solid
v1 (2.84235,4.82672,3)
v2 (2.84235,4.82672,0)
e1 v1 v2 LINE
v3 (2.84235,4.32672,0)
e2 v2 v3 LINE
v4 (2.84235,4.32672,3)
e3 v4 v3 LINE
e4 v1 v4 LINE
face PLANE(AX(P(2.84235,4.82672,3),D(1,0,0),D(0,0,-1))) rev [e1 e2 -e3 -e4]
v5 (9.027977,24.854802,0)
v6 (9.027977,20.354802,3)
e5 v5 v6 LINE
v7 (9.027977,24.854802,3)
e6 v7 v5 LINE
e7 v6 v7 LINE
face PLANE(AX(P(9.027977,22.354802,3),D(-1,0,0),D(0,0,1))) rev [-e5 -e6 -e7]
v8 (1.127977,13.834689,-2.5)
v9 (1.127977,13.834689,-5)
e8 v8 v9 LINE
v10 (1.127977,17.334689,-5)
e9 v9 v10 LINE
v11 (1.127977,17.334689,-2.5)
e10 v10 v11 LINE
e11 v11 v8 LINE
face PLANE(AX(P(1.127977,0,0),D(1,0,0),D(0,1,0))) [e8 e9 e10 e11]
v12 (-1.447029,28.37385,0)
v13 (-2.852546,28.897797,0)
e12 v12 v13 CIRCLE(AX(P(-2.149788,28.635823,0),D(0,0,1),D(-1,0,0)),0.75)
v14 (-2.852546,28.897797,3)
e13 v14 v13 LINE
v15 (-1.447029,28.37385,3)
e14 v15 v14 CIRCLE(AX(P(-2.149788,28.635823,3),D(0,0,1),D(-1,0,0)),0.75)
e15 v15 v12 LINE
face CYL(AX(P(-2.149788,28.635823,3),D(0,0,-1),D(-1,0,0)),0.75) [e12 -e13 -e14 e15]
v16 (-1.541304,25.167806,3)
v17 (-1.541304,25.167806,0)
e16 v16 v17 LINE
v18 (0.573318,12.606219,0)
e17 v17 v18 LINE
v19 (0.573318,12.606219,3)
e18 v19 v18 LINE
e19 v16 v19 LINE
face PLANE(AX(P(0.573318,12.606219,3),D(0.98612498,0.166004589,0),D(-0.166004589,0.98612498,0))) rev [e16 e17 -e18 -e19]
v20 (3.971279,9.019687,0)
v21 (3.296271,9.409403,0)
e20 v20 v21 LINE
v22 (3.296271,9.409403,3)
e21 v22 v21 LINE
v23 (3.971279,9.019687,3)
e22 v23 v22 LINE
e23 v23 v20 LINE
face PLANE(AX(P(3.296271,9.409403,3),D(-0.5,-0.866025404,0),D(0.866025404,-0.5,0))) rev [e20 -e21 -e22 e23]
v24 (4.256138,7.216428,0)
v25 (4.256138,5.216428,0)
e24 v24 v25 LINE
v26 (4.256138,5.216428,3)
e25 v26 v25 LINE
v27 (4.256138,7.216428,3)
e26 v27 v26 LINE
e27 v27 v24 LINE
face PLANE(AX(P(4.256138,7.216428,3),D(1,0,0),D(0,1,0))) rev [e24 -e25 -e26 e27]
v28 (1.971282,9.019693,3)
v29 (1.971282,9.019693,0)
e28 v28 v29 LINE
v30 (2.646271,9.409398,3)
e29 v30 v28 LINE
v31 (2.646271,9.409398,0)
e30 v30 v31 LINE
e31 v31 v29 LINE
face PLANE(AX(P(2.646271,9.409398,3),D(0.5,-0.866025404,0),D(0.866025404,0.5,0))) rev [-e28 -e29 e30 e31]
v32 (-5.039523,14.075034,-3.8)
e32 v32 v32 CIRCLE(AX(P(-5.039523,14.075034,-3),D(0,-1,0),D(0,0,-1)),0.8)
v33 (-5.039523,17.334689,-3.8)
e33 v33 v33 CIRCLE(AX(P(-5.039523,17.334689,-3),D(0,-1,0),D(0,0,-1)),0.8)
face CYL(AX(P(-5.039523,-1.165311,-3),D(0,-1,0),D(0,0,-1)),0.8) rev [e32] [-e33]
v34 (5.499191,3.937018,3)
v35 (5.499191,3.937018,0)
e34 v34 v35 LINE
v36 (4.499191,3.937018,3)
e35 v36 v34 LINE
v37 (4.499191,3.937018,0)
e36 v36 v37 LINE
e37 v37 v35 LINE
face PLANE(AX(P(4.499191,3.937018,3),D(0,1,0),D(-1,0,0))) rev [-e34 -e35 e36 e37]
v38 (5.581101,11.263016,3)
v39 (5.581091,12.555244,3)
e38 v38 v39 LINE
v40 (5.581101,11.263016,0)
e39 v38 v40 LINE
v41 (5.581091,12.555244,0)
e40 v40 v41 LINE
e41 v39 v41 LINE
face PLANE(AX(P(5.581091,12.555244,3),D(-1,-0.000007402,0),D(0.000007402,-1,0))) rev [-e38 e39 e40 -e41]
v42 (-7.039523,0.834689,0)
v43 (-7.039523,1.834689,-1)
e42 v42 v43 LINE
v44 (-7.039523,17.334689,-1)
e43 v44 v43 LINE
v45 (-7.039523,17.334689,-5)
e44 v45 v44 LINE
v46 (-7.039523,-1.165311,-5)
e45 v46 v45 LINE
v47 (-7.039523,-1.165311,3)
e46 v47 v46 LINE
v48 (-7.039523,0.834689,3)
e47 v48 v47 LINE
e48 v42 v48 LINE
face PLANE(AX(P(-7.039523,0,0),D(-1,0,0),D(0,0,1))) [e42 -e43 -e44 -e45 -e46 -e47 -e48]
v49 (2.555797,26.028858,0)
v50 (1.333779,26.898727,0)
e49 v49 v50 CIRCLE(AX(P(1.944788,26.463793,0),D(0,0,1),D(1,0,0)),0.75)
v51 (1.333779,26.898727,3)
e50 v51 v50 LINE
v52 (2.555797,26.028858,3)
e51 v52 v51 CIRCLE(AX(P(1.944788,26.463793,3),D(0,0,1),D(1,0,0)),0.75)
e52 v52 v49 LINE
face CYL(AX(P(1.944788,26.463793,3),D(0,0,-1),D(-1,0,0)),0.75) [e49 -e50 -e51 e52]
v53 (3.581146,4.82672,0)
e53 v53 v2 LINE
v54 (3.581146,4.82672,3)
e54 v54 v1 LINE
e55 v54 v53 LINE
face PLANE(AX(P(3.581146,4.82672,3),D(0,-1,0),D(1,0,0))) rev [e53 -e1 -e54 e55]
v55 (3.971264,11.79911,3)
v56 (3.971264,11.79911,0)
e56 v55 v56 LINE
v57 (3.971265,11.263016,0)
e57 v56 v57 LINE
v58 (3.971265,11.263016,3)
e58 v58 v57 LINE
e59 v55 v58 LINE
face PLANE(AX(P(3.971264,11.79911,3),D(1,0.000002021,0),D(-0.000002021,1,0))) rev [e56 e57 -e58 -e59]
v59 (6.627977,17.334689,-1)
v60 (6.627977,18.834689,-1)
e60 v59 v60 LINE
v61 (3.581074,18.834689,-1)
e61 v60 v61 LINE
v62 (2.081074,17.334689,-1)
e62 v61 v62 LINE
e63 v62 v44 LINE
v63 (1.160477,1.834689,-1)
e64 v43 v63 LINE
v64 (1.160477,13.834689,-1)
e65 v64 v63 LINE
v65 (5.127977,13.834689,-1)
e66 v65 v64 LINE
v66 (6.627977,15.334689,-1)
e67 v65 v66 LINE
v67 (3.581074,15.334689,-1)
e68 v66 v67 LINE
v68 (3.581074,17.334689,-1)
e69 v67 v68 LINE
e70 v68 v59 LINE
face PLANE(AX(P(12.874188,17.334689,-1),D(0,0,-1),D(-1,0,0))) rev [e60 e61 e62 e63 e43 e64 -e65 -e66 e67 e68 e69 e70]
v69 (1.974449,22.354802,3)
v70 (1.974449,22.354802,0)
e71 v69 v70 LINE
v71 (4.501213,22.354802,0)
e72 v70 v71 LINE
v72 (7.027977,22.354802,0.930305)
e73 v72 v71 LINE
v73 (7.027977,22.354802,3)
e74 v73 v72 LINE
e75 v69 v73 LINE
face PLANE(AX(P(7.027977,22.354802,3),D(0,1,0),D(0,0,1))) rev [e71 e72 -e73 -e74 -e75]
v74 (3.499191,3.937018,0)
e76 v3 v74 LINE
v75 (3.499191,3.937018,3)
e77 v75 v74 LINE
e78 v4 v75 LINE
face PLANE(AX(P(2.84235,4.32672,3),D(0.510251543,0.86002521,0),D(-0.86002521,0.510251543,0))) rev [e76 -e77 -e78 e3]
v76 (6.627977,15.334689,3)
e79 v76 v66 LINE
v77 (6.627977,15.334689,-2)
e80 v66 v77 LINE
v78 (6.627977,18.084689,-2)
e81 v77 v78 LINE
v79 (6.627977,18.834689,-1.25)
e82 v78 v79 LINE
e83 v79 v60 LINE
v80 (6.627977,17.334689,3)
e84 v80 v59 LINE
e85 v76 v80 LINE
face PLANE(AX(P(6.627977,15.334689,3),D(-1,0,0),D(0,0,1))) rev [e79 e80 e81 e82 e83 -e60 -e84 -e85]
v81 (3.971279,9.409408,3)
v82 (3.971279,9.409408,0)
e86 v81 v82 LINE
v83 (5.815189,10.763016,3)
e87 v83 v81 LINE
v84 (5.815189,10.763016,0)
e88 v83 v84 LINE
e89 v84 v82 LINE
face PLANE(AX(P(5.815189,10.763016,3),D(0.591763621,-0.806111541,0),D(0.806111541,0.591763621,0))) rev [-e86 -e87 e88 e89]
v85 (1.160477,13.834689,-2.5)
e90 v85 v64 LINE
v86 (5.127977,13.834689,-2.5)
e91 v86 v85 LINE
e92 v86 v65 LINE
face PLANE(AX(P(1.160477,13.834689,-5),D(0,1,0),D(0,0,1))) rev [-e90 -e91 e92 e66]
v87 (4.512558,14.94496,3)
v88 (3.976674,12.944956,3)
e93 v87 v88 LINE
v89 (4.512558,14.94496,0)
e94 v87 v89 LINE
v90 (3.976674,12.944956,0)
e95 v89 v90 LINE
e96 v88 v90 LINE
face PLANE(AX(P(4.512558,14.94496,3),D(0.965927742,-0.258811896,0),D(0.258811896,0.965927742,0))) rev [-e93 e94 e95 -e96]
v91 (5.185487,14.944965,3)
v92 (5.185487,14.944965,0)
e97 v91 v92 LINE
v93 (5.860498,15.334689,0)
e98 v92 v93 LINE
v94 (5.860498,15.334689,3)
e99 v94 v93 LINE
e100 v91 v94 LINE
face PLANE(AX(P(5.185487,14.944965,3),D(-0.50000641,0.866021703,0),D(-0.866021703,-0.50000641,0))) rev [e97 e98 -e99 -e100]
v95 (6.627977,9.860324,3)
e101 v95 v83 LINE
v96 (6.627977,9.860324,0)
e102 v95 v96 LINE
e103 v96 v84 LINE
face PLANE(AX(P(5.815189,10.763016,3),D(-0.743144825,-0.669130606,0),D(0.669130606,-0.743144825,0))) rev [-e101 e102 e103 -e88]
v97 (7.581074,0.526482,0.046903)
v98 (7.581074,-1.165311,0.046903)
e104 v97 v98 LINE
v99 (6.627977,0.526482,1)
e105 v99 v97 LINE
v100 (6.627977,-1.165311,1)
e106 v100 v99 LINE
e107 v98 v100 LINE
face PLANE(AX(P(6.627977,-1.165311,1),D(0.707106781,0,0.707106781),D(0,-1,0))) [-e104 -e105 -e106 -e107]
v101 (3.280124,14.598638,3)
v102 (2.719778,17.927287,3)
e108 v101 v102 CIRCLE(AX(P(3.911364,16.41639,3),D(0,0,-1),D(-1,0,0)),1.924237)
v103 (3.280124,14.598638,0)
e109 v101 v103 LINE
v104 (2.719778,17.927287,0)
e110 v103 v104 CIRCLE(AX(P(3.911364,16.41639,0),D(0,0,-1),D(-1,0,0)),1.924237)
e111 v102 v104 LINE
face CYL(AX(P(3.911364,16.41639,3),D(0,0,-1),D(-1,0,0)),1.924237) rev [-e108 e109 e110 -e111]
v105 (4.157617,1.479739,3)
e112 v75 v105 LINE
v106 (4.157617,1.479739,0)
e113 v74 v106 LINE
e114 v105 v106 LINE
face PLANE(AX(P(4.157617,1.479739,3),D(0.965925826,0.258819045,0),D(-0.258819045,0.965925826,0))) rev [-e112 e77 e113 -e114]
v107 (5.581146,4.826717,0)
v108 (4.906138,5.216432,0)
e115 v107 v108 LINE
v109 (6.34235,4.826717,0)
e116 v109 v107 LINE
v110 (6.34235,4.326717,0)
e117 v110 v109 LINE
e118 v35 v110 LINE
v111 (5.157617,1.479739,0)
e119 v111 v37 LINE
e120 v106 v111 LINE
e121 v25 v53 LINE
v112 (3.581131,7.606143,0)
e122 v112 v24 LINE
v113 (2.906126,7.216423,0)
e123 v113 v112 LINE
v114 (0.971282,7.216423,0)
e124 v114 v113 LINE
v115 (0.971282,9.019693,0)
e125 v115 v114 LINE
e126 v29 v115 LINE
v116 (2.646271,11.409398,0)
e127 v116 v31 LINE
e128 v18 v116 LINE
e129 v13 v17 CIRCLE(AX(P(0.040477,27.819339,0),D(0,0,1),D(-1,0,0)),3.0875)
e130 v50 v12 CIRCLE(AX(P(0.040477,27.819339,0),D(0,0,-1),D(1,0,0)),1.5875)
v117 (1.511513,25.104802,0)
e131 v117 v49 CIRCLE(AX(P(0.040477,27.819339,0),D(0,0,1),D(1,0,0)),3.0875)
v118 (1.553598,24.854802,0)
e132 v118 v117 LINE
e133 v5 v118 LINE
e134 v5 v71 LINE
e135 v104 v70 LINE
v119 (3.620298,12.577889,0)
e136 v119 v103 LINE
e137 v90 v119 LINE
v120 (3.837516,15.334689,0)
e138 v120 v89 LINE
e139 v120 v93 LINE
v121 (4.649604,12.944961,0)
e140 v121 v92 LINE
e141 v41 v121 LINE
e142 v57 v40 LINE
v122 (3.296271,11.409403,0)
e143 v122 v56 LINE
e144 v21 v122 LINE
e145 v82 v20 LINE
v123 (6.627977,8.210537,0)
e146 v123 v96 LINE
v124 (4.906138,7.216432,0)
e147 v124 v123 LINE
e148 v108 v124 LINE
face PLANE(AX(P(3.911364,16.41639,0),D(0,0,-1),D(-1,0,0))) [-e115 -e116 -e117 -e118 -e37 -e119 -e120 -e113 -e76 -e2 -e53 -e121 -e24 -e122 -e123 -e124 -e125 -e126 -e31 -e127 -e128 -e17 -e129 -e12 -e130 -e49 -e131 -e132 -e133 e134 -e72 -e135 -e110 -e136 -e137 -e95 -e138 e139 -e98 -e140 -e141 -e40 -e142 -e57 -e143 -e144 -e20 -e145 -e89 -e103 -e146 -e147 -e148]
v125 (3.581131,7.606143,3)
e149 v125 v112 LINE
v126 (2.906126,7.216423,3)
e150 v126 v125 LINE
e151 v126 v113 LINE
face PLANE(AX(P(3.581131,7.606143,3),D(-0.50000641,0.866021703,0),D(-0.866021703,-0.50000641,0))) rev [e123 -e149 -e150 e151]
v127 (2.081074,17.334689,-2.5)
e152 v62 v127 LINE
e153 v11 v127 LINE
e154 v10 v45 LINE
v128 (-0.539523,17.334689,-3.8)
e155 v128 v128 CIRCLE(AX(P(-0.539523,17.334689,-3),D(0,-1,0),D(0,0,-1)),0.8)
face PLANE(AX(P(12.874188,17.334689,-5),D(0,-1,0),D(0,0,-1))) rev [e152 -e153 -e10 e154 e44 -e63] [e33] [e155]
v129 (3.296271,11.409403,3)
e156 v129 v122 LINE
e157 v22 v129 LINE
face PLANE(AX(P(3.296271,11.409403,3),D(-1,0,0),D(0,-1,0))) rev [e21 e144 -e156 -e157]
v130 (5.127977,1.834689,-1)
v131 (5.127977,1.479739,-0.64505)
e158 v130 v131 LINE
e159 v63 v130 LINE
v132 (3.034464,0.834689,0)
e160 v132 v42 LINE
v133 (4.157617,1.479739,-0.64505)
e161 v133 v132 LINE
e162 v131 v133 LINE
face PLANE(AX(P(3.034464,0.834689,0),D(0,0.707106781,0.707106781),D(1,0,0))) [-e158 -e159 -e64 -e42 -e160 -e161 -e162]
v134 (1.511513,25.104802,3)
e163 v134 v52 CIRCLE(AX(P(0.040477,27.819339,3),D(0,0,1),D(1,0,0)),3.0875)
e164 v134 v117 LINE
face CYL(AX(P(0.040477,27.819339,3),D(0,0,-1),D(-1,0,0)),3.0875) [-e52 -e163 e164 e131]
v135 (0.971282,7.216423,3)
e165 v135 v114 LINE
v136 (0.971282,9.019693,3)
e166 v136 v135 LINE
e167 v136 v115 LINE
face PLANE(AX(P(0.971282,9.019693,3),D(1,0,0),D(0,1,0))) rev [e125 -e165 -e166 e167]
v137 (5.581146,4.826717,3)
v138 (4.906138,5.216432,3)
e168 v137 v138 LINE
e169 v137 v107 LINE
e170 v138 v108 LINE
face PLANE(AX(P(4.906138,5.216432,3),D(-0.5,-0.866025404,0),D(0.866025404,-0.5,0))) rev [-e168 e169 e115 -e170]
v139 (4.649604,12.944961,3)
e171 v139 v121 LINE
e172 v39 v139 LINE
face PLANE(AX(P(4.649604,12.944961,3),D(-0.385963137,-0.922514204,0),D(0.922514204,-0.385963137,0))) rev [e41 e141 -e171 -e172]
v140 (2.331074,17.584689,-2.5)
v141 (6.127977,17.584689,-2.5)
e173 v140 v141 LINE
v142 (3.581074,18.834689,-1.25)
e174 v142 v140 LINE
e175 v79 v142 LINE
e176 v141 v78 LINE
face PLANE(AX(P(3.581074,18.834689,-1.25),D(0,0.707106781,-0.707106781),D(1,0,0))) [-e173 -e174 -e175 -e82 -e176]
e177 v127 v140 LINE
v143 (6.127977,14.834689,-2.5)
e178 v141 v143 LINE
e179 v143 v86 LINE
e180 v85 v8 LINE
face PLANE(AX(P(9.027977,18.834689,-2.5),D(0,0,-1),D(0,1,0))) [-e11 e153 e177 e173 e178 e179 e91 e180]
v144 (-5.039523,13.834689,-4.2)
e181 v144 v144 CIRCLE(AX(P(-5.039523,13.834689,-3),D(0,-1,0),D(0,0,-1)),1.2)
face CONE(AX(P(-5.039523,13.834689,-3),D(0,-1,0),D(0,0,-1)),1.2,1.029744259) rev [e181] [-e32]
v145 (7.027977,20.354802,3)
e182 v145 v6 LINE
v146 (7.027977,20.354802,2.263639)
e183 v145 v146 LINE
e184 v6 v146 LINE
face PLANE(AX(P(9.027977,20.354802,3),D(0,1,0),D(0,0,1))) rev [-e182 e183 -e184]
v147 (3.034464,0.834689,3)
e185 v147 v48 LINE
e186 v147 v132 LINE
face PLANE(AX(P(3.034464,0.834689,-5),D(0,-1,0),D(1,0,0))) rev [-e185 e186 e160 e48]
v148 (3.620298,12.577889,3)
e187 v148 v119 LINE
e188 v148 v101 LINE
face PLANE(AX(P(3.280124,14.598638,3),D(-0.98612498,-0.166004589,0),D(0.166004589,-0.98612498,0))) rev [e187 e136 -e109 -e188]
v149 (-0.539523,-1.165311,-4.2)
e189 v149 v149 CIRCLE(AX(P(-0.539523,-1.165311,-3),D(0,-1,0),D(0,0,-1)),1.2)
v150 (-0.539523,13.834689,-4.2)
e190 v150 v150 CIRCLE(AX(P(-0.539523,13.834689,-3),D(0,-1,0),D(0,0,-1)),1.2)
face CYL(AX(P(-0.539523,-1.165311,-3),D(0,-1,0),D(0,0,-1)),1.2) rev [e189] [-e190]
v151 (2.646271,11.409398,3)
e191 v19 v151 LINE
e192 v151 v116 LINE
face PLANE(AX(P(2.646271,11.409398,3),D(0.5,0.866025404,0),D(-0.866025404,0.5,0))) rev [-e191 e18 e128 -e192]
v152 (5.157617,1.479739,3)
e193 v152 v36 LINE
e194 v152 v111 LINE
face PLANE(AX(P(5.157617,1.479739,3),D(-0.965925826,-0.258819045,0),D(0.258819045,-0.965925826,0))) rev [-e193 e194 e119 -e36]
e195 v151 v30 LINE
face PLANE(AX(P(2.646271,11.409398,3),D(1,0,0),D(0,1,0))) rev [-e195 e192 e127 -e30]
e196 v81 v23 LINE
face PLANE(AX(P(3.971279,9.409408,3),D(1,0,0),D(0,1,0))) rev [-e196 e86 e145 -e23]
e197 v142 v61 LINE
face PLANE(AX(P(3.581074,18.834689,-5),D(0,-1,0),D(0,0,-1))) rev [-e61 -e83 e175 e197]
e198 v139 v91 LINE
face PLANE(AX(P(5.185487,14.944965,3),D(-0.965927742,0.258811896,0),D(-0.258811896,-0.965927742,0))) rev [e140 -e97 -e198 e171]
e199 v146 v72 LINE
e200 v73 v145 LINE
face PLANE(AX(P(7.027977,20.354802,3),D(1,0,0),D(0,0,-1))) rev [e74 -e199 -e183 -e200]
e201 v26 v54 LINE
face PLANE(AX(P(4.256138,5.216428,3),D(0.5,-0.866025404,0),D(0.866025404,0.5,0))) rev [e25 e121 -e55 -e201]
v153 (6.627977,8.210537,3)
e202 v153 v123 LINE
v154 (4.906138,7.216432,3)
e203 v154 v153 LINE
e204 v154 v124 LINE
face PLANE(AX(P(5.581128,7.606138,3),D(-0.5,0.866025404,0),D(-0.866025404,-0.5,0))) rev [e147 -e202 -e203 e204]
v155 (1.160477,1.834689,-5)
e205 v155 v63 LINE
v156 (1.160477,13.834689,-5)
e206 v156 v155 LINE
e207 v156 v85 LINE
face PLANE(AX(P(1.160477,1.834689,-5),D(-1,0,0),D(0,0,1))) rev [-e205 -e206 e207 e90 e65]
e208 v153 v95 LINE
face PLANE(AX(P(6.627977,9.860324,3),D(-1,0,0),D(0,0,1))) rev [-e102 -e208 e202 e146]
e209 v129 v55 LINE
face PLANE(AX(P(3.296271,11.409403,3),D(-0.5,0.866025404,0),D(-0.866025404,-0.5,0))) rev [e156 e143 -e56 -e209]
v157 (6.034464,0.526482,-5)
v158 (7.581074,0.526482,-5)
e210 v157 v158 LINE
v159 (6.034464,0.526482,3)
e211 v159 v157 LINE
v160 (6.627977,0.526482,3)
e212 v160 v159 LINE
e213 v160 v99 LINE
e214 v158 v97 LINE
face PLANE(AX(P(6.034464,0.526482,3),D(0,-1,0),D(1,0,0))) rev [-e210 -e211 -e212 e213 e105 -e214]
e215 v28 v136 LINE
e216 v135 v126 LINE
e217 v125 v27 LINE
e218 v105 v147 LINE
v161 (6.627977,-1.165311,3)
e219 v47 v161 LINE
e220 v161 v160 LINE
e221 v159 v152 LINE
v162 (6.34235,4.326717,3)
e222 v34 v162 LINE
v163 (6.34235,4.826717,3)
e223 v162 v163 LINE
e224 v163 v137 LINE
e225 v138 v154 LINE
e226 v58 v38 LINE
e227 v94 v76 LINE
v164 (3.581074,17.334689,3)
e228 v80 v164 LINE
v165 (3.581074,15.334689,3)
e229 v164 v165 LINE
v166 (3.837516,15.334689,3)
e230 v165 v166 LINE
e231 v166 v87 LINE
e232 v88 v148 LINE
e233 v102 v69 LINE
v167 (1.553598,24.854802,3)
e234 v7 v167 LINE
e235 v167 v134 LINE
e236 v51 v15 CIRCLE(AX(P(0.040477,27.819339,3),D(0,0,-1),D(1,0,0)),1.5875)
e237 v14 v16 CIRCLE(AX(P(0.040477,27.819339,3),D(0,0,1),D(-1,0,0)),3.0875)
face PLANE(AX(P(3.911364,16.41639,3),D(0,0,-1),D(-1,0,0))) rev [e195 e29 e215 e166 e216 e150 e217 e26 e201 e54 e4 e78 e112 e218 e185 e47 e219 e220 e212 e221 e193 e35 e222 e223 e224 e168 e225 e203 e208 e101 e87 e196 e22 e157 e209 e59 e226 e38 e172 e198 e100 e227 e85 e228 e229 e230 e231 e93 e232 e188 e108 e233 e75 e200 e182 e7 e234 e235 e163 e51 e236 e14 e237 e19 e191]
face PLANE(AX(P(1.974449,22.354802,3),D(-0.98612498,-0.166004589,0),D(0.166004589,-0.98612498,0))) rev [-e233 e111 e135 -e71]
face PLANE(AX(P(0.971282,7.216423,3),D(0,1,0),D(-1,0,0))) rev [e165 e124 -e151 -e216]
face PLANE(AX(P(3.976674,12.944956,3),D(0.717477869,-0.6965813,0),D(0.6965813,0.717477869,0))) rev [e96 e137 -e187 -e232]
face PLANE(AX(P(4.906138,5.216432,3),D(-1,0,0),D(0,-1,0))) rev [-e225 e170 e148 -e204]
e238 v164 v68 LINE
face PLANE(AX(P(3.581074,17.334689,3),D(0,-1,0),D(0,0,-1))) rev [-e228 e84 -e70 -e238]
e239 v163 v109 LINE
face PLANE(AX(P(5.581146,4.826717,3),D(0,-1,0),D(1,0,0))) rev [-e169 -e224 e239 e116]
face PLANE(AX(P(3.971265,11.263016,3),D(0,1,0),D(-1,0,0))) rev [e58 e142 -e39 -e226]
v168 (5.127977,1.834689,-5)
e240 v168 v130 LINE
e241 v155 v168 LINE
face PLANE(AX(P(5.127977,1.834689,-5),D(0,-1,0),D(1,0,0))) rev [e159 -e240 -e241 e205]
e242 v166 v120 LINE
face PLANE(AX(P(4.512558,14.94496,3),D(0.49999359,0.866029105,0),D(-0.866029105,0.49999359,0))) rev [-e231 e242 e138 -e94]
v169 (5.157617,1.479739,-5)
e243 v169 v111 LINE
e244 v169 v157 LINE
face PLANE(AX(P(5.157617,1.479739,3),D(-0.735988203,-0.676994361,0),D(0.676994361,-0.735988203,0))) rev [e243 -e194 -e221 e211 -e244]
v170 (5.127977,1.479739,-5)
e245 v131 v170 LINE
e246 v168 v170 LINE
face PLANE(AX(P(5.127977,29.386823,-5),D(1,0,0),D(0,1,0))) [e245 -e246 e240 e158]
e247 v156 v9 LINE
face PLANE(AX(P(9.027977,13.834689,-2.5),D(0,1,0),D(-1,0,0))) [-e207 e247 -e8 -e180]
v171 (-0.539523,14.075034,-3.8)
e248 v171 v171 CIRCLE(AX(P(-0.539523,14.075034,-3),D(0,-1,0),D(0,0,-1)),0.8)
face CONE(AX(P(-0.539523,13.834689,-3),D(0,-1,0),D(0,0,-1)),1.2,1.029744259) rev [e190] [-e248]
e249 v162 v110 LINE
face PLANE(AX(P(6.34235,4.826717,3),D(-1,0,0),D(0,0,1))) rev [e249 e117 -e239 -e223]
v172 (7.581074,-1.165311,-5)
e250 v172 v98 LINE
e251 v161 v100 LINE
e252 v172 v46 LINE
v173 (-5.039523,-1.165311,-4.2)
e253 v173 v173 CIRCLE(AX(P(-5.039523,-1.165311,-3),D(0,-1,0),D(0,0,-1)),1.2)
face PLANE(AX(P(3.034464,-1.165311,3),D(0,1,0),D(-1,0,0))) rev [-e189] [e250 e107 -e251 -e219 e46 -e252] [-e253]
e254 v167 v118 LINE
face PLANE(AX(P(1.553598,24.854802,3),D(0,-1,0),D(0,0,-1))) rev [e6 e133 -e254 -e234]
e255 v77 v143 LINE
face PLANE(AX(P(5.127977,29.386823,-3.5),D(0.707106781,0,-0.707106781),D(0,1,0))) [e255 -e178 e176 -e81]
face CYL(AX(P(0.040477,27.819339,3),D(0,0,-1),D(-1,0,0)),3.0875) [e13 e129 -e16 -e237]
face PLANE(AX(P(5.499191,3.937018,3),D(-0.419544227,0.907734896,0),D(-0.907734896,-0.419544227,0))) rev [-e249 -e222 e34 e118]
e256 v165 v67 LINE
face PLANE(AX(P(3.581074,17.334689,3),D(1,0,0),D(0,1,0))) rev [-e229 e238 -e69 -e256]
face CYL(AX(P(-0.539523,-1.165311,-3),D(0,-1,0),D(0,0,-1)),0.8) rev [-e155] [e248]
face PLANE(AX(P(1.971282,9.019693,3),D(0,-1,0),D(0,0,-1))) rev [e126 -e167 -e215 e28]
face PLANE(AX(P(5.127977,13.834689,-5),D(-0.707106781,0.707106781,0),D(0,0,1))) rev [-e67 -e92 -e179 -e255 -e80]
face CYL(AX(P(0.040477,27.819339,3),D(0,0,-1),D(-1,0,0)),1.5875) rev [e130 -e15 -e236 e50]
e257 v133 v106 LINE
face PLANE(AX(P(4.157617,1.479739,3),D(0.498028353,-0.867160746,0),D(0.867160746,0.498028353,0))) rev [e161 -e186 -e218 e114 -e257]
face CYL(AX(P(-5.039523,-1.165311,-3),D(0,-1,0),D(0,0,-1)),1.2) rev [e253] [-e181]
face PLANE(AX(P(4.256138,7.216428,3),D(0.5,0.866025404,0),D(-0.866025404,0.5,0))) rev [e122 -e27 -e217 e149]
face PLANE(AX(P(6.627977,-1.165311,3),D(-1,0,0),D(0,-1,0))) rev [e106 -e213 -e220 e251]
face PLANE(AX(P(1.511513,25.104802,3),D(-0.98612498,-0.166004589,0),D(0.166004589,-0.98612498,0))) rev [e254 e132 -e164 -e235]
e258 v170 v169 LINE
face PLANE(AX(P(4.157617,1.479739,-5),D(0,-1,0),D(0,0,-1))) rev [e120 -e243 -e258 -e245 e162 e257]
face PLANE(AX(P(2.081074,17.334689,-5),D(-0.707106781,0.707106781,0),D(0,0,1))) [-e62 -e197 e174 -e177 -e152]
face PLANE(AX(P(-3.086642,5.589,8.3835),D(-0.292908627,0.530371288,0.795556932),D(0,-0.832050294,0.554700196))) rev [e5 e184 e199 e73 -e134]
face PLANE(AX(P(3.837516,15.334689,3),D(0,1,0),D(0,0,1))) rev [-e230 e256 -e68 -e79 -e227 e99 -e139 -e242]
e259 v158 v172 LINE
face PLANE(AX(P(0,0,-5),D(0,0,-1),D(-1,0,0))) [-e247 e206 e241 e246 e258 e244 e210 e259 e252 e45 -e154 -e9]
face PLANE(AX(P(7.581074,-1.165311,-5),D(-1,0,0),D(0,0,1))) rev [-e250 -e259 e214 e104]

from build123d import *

# Parameters (mm, degrees)
BOSS_SWITCH_BODY_DEPTH                    = 3
SKETCH1_W                                 = 4
SKETCH1_H                                 = 3.5
BOSS_FLANGE_WIDTH_DEPTH                   = 5
BOSS_FLANGE_HEIGHT_REACH                  = 35.863
SKETCH2_W                                 = 4
SKETCH2_H                                 = 2
SKETCH2_W_2                               = 8
CUT_UP_TO_DOWN_DERAILLEUR_CLEARANCE_REACH = 21.462
SKETCH10_W                                = 2.453096586
SKETCH10_H                                = 3
SKETCH17_W                                = 12.1675
SKETCH17_H                                = 4
BOSS_FLANGE_SUPPORT_DEPTH                 = 14.499999955
TAP_DRILL_FOR_M2X0_4_TAP1_D               = 1.6
M2_CLEARANCE_HOLE2_D                      = 2.4
M2_CLEARANCE_HOLE2_DEPTH                  = 15
M2_CLEARANCE_HOLE2_TIP                    = 0.721032743
CHAMFER_FLANGE_SUPPORT_SIZE               = 1.5
CHAMFER_FLANGE_SUPPORT_2_SIZE             = 1.5
CHAMFER_FLANGE_SUPPORT_3_SIZE             = 1
SKETCH23_W                                = 3.9675
SKETCH23_H                                = 11.999999954
CUT_GAP_FOR_PRINTING_DEPTH                = 32.000499688
SKETCH25_W                                = 0.953096586
SKETCH25_H                                = 3.5
CUT_DERAILLEUR_CLEARANCE_DEPTH            = 32.145320369
CHAMFER8_SIZE                             = 1
CUT_UP_TO_DOWN_CANTILEVER_SLOPE_REACH     = 31.869
SKETCH26_W                                = 12.477246204
SKETCH26_H                                = 5.771077126
CUT_WIDE_DERAILLEUR_CLEARANCE_DEPTH       = 33.195879702
CUT_WIDE_DERAILLEUR_CLEARANCE_DEPTH_BACK  = 4
SKETCH27_W                                = 2.5
SKETCH27_H                                = 5.000000046
CHAMFER9_SIZE                             = 1.25
SKETCH28_W                                = 3.046903414
SKETCH28_H                                = 1.5
CUT_EXTRUDE1_DEPTH                        = 1


# Some blends are built 0.0001 mm under size
with BuildPart() as part:
    # Sketch-SwitchBossUp → Boss-Switch Body (new body)
    with BuildSketch(Plane.XY):
        with BuildLine():
            Line((5.581091201, 12.55524379), (5.581100766, 11.263016279))
            Line((5.581100766, 11.263016279), (3.971265023, 11.263016279))
            Line((3.971265023, 11.263016279), (3.97126394, 11.79911022))
            Line((3.97126394, 11.79911022), (3.296271341, 11.409403061))
            Line((3.296271341, 11.409403061), (3.296271341, 9.409403061))
            Line((3.296271341, 9.409403061), (3.971278743, 9.019687356))
            Line((3.971278743, 9.019687356), (3.971278743, 9.409408058))
            Line((3.971278743, 9.409408058), (5.815189336, 10.763016279))
            Line((5.815189336, 10.763016279), (6.627976927, 9.860324207))
            Line((6.627976927, 9.860324207), (6.627976927, 8.210536506))
            Line((6.627976927, 8.210536506), (5.581127833, 7.606137899))
            Line((5.581127833, 7.606137899), (4.906138119, 7.216432406))
            Line((4.906138119, 7.216432406), (4.906138119, 5.216432406))
            Line((4.906138119, 5.216432406), (5.58114552, 4.826716701))
            Line((5.58114552, 4.826716701), (6.342350466, 4.826716701))
            Line((6.342350466, 4.826716701), (6.342350466, 4.326716701))
            Line((6.342350466, 4.326716701), (5.499190584, 3.937018274))
            Line((5.499190584, 3.937018274), (4.499190584, 3.937018274))
            Line((4.499190584, 3.937018274), (5.157616583, 1.479738993))
            Line((5.157616583, 1.479738993), (6.034464198, 0.526482161))
            Line((6.034464198, 0.526482161), (6.627976927, 0.526482161))
            Line((6.627976927, 0.526482161), (6.627976927, -1.165310653))
            Line((6.627976927, -1.165310653), (3.034464198, -1.165310653))
            Line((3.034464198, -1.165310653), (3.034464198, 0.834689347))
            Line((3.034464198, 0.834689347), (4.157616583, 1.479738993))
            Line((4.157616583, 1.479738993), (3.499190584, 3.937018274))
            Line((3.499190584, 3.937018274), (2.842350466, 4.326720436))
            Line((2.842350466, 4.326720436), (2.842350466, 4.826720436))
            Line((2.842350466, 4.826720436), (3.58114552, 4.826720436))
            Line((3.58114552, 4.826720436), (4.256138119, 5.216427595))
            Line((4.256138119, 5.216427595), (4.256138119, 7.216427595))
            Line((4.256138119, 7.216427595), (3.581130717, 7.6061433))
            Line((3.581130717, 7.6061433), (2.9061262, 7.216422599))
            Line((2.9061262, 7.216422599), (0.971281627, 7.216422599))
            Line((0.971281627, 7.216422599), (0.971281627, 9.019692757))
            Line((0.971281627, 9.019692757), (1.971281627, 9.019692757))
            Line((1.971281627, 9.019692757), (2.646271341, 9.40939825))
            Line((2.646271341, 9.40939825), (2.646271341, 11.40939825))
            Line((2.646271341, 11.40939825), (1.696557212, 11.957715958))
            Line((1.696557212, 11.957715958), (0.573317845, 12.60621851))
            Line((0.573317845, 12.60621851), (-1.541303694, 25.167805745))
            ThreePointArc((-1.541303694, 25.167805745), (-2.872284003, 26.795385437), (-2.852546321, 28.897797067))
            ThreePointArc((-2.852546321, 28.897797067), (-1.887813913, 29.338582026), (-1.447028953, 28.373849618))
            ThreePointArc((-1.447028953, 28.373849618), (-0.703448682, 26.416936722), (1.333779254, 26.898727173))
            ThreePointArc((1.333779254, 26.898727173), (2.379722745, 27.074801628), (2.555797201, 26.028858137))
            ThreePointArc((2.555797201, 26.028858137), (2.086504637, 25.507104397), (1.511513111, 25.104801997))
            Line((1.511513111, 25.104801997), (1.553598189, 24.854801997))
            Line((1.553598189, 24.854801997), (9.027976927, 24.854801997))
            Line((9.027976927, 24.854801997), (9.027976927, 22.354801997))
            Line((9.027976927, 22.354801997), (9.027976927, 20.354801997))
            Line((9.027976927, 20.354801997), (7.027976927, 20.354801997))
            Line((7.027976927, 20.354801997), (7.027976927, 22.354801997))
            Line((7.027976927, 22.354801997), (1.974448974, 22.354801997))
            Line((1.974448974, 22.354801997), (2.719778232, 17.927287042))
            ThreePointArc((2.719778232, 17.927287042), (2.013826204, 16.096957693), (3.280124137, 14.598637521))
            Line((3.280124137, 14.598637521), (3.620297651, 12.577888564))
            Line((3.620297651, 12.577888564), (3.976674365, 12.944956135))
            Line((3.976674365, 12.944956135), (4.512557947, 14.944960101))
            Line((4.512557947, 14.944960101), (3.837515632, 15.334689301))
            Line((3.837515632, 15.334689301), (3.581073513, 15.334689301))
            Line((3.581073513, 15.334689301), (3.581073513, 17.334689301))
            Line((3.581073513, 17.334689301), (5.725580434, 17.334689301))
            Line((5.725580434, 17.334689301), (6.627976927, 17.334689301))
            Line((6.627976927, 17.334689301), (6.627976927, 15.334689301))
            Line((6.627976927, 15.334689301), (5.860498075, 15.334689301))
            Line((5.860498075, 15.334689301), (5.185487464, 14.944965082))
            Line((5.185487464, 14.944965082), (4.649603883, 12.944961115))
            Line((4.649603883, 12.944961115), (5.581091201, 12.55524379))
        make_face()
    extrude(amount=BOSS_SWITCH_BODY_DEPTH)

    # Sketch1 → Boss-Flange Width (add)
    with BuildSketch(Plane(origin=(0, 0, 0), x_dir=(-1, 0, 0), z_dir=(0, 0, -1))):
        Polygon((-7.581073513, -1.165310653), (0.412170615, -1.165310653), (0.412170615, 0.834689347), (-3.034464198, 0.834689347), (-4.157616583, 1.479738993), (-5.157616583, 1.479738993), (-6.034464198, 0.526482161), (-7.581073513, 0.526482161), align=None)
        with Locations((-5.581073513, 17.084689301)):
            Rectangle(SKETCH1_W, SKETCH1_H)
    extrude(amount=BOSS_FLANGE_WIDTH_DEPTH)

    # Sketch2 → Boss-Flange Height (add, up to next)
    with BuildSketch(Plane(origin=(-7.039523073, 0, 0), x_dir=(0, 0, -1), z_dir=(1, 0, 0)), mode=Mode.PRIVATE) as boss_flange_height_sk1:
        with Locations((3, 16.334689301)):
            Rectangle(SKETCH2_W, SKETCH2_H)
    boss_flange_height_tool1 = extrude(boss_flange_height_sk1.sketch, amount=BOSS_FLANGE_HEIGHT_REACH, mode=Mode.PRIVATE) - part.part
    # Sketch2 → Boss-Flange Height (add, up to next)
    with BuildSketch(Plane(origin=(-7.039523073, 0, 0), x_dir=(0, 0, -1), z_dir=(1, 0, 0)), mode=Mode.PRIVATE) as boss_flange_height_sk2:
        with Locations((1, -0.165310653)):
            Rectangle(SKETCH2_W_2, SKETCH2_H)
    boss_flange_height_tool2 = extrude(boss_flange_height_sk2.sketch, amount=BOSS_FLANGE_HEIGHT_REACH, mode=Mode.PRIVATE) - part.part
    add(boss_flange_height_tool1.solids().sort_by_distance((-7.039523, 16.334689, -3))[0])
    add(boss_flange_height_tool2.solids().sort_by_distance((-7.039523, -0.165311, -1))[0])

    # Sketch10 → Cut-Up-To-Down Derailleur Clearance (cut, up to next)
    with BuildSketch(Plane(origin=(0, 15.334689301, 0), x_dir=(1, 0, 0), z_dir=(0, 1, 0)), mode=Mode.PRIVATE) as cut_up_to_down_derailleur_clearance_sk1:
        with Locations((6.35452522, 3.5)):
            Rectangle(SKETCH10_W, SKETCH10_H)
    cut_up_to_down_derailleur_clearance_tool1 = extrude(cut_up_to_down_derailleur_clearance_sk1.sketch, amount=CUT_UP_TO_DOWN_DERAILLEUR_CLEARANCE_REACH, mode=Mode.PRIVATE) & part.part
    add(cut_up_to_down_derailleur_clearance_tool1.solids().sort_by_distance((6.354525, 15.334689, -3.5))[0], mode=Mode.SUBTRACT)

    # Sketch17 → Boss-Flange Support (add)
    with BuildSketch(Plane.XZ.offset(-15.334689301)):
        with Locations((-0.955773073, -3)):
            Rectangle(SKETCH17_W, SKETCH17_H)
    extrude(amount=BOSS_FLANGE_SUPPORT_DEPTH)

    # Tap Drill for M2x0.4 Tap1 (through all)
    with Locations(Plane(origin=(0, -1.165310653, 0), x_dir=(-1, 0, 0), z_dir=(0, -1, 0))):
        with Locations((5.039523073, 3), (0.539523073, 3)):
            Hole(TAP_DRILL_FOR_M2X0_4_TAP1_D / 2)

    # M2 Clearance Hole2
    with Locations(Plane.XZ.offset(1.165310653)):
        with Locations((-5.039523073, -3), (-0.539523073, -3)):
            Hole(M2_CLEARANCE_HOLE2_D / 2, depth=M2_CLEARANCE_HOLE2_DEPTH)
            with Locations((0, 0, -(M2_CLEARANCE_HOLE2_DEPTH + M2_CLEARANCE_HOLE2_TIP / 2))):  # 118° drill point
                Cone(0, M2_CLEARANCE_HOLE2_D / 2, M2_CLEARANCE_HOLE2_TIP, mode=Mode.SUBTRACT)

    # Chamfer-Flange Support
    chamfer_flange_support_edges = [part.edges().sort_by_distance(p)[0] for p in [
        (3.581073513, 17.334689301, -3),
    ]]
    chamfer(chamfer_flange_support_edges, length=CHAMFER_FLANGE_SUPPORT_SIZE - 0.0001)  # a hair under: the kernel refuses the full size

    # Chamfer-Flange Support 2
    chamfer_flange_support_2_edges = [part.edges().sort_by_distance(p)[0] for p in [
        (5.127976927, 17.084689301, -2),
        (5.127976927, 15.334689301, -1.5),
    ]]
    chamfer(chamfer_flange_support_2_edges, length=CHAMFER_FLANGE_SUPPORT_2_SIZE)

    # Chamfer-Flange Support 3
    chamfer_flange_support_3_edges = [part.edges().sort_by_distance(p)[0] for p in [
        (-2.002529437, 0.834689346, -1),
    ]]
    chamfer(chamfer_flange_support_3_edges, length=CHAMFER_FLANGE_SUPPORT_3_SIZE)

    # Sketch23 → Cut-Gap for Printing (cut, through all)
    with BuildSketch(Plane.XY.offset(-1)):
        with Locations((3.144226927, 7.834689324)):
            Rectangle(SKETCH23_W, SKETCH23_H)
    extrude(amount=-CUT_GAP_FOR_PRINTING_DEPTH, mode=Mode.SUBTRACT)

    # Sketch25 → Cut-Derailleur Clearance (cut, through all)
    with BuildSketch(Plane.XY):
        with Locations((7.10452522, 17.084689301)):
            Rectangle(SKETCH25_W, SKETCH25_H)
    extrude(amount=-CUT_DERAILLEUR_CLEARANCE_DEPTH, mode=Mode.SUBTRACT)

    # Chamfer8
    # the kernel refuses this chamfer: 1 mm, written as the material it adds along each edge
    with BuildSketch(Plane(origin=(6.627976927, 0.526482161, 0), x_dir=(0.9996219169112968, -3.148763632499715e-15, -0.027495876610586365), z_dir=(0, -1, 0))) as chamfer8_piece_1_section:
        Polygon((CHAMFER8_SIZE * 0.999621916911, CHAMFER8_SIZE * 0.0274958766106), (-CHAMFER8_SIZE * 0.0274958766106, CHAMFER8_SIZE * 0.999621916911), (0, 0), align=None)
    chamfer8_piece_1 = extrude(amount=1.691792814, mode=Mode.PRIVATE)
    chamfer8_piece_1 = split(chamfer8_piece_1, bisect_by=Plane(origin=(7.581073513, -0.319414246, 0.332375145), z_dir=(-1, 0, 0)), keep=Keep.TOP, mode=Mode.PRIVATE)
    add(chamfer8_piece_1)

    # Sketch26 → Cut-Up-to-Down Cantilever Slope (cut, up to next)
    with BuildSketch(Plane(origin=(-3.086642121, 5.589000146, 8.383500218), x_dir=(-0.9561404375276108, -0.1624764728289173, -0.24371470924337582), z_dir=(0.2929086269205964, -0.5303712883154423, -0.795556932473163)), mode=Mode.PRIVATE) as cut_up_to_down_cantilever_slope_sk1:
        with Locations((-13.791615152, 17.794906754)):
            Rectangle(SKETCH26_W, SKETCH26_H)
    cut_up_to_down_cantilever_slope_tool1 = extrude(cut_up_to_down_cantilever_slope_sk1.sketch, amount=CUT_UP_TO_DOWN_CANTILEVER_SLOPE_REACH, mode=Mode.PRIVATE) & part.part
    add(cut_up_to_down_cantilever_slope_tool1.solids().sort_by_distance((10.100079, 22.636071, 1.873881))[0], mode=Mode.SUBTRACT)

    # Sketch27 → Cut-Wide Derailleur Clearance (cut, two sides: drawn at the far end of the back side and taken through both)
    with BuildSketch(Plane(origin=(5.127976927, 0, 0), x_dir=(0, 0, -1), z_dir=(1, 0, 0)).offset(-CUT_WIDE_DERAILLEUR_CLEARANCE_DEPTH_BACK)):
        with Locations((3.75, 16.334689324)):
            Rectangle(SKETCH27_W, SKETCH27_H)
    extrude(amount=CUT_WIDE_DERAILLEUR_CLEARANCE_DEPTH + CUT_WIDE_DERAILLEUR_CLEARANCE_DEPTH_BACK, mode=Mode.SUBTRACT)

    # Chamfer9
    chamfer9_edges = [part.edges().sort_by_distance(p)[0] for p in [
        (4.85452522, 18.834689347, -2.5),
    ]]
    chamfer(chamfer9_edges, length=CHAMFER9_SIZE)

    # Sketch28 → Cut-Extrude1 (cut)
    with BuildSketch(Plane.XY.offset(-1)):
        with Locations((5.10452522, 18.084689301)):
            Rectangle(SKETCH28_W, SKETCH28_H)
    extrude(amount=CUT_EXTRUDE1_DEPTH, mode=Mode.SUBTRACT)


solid = part.part
